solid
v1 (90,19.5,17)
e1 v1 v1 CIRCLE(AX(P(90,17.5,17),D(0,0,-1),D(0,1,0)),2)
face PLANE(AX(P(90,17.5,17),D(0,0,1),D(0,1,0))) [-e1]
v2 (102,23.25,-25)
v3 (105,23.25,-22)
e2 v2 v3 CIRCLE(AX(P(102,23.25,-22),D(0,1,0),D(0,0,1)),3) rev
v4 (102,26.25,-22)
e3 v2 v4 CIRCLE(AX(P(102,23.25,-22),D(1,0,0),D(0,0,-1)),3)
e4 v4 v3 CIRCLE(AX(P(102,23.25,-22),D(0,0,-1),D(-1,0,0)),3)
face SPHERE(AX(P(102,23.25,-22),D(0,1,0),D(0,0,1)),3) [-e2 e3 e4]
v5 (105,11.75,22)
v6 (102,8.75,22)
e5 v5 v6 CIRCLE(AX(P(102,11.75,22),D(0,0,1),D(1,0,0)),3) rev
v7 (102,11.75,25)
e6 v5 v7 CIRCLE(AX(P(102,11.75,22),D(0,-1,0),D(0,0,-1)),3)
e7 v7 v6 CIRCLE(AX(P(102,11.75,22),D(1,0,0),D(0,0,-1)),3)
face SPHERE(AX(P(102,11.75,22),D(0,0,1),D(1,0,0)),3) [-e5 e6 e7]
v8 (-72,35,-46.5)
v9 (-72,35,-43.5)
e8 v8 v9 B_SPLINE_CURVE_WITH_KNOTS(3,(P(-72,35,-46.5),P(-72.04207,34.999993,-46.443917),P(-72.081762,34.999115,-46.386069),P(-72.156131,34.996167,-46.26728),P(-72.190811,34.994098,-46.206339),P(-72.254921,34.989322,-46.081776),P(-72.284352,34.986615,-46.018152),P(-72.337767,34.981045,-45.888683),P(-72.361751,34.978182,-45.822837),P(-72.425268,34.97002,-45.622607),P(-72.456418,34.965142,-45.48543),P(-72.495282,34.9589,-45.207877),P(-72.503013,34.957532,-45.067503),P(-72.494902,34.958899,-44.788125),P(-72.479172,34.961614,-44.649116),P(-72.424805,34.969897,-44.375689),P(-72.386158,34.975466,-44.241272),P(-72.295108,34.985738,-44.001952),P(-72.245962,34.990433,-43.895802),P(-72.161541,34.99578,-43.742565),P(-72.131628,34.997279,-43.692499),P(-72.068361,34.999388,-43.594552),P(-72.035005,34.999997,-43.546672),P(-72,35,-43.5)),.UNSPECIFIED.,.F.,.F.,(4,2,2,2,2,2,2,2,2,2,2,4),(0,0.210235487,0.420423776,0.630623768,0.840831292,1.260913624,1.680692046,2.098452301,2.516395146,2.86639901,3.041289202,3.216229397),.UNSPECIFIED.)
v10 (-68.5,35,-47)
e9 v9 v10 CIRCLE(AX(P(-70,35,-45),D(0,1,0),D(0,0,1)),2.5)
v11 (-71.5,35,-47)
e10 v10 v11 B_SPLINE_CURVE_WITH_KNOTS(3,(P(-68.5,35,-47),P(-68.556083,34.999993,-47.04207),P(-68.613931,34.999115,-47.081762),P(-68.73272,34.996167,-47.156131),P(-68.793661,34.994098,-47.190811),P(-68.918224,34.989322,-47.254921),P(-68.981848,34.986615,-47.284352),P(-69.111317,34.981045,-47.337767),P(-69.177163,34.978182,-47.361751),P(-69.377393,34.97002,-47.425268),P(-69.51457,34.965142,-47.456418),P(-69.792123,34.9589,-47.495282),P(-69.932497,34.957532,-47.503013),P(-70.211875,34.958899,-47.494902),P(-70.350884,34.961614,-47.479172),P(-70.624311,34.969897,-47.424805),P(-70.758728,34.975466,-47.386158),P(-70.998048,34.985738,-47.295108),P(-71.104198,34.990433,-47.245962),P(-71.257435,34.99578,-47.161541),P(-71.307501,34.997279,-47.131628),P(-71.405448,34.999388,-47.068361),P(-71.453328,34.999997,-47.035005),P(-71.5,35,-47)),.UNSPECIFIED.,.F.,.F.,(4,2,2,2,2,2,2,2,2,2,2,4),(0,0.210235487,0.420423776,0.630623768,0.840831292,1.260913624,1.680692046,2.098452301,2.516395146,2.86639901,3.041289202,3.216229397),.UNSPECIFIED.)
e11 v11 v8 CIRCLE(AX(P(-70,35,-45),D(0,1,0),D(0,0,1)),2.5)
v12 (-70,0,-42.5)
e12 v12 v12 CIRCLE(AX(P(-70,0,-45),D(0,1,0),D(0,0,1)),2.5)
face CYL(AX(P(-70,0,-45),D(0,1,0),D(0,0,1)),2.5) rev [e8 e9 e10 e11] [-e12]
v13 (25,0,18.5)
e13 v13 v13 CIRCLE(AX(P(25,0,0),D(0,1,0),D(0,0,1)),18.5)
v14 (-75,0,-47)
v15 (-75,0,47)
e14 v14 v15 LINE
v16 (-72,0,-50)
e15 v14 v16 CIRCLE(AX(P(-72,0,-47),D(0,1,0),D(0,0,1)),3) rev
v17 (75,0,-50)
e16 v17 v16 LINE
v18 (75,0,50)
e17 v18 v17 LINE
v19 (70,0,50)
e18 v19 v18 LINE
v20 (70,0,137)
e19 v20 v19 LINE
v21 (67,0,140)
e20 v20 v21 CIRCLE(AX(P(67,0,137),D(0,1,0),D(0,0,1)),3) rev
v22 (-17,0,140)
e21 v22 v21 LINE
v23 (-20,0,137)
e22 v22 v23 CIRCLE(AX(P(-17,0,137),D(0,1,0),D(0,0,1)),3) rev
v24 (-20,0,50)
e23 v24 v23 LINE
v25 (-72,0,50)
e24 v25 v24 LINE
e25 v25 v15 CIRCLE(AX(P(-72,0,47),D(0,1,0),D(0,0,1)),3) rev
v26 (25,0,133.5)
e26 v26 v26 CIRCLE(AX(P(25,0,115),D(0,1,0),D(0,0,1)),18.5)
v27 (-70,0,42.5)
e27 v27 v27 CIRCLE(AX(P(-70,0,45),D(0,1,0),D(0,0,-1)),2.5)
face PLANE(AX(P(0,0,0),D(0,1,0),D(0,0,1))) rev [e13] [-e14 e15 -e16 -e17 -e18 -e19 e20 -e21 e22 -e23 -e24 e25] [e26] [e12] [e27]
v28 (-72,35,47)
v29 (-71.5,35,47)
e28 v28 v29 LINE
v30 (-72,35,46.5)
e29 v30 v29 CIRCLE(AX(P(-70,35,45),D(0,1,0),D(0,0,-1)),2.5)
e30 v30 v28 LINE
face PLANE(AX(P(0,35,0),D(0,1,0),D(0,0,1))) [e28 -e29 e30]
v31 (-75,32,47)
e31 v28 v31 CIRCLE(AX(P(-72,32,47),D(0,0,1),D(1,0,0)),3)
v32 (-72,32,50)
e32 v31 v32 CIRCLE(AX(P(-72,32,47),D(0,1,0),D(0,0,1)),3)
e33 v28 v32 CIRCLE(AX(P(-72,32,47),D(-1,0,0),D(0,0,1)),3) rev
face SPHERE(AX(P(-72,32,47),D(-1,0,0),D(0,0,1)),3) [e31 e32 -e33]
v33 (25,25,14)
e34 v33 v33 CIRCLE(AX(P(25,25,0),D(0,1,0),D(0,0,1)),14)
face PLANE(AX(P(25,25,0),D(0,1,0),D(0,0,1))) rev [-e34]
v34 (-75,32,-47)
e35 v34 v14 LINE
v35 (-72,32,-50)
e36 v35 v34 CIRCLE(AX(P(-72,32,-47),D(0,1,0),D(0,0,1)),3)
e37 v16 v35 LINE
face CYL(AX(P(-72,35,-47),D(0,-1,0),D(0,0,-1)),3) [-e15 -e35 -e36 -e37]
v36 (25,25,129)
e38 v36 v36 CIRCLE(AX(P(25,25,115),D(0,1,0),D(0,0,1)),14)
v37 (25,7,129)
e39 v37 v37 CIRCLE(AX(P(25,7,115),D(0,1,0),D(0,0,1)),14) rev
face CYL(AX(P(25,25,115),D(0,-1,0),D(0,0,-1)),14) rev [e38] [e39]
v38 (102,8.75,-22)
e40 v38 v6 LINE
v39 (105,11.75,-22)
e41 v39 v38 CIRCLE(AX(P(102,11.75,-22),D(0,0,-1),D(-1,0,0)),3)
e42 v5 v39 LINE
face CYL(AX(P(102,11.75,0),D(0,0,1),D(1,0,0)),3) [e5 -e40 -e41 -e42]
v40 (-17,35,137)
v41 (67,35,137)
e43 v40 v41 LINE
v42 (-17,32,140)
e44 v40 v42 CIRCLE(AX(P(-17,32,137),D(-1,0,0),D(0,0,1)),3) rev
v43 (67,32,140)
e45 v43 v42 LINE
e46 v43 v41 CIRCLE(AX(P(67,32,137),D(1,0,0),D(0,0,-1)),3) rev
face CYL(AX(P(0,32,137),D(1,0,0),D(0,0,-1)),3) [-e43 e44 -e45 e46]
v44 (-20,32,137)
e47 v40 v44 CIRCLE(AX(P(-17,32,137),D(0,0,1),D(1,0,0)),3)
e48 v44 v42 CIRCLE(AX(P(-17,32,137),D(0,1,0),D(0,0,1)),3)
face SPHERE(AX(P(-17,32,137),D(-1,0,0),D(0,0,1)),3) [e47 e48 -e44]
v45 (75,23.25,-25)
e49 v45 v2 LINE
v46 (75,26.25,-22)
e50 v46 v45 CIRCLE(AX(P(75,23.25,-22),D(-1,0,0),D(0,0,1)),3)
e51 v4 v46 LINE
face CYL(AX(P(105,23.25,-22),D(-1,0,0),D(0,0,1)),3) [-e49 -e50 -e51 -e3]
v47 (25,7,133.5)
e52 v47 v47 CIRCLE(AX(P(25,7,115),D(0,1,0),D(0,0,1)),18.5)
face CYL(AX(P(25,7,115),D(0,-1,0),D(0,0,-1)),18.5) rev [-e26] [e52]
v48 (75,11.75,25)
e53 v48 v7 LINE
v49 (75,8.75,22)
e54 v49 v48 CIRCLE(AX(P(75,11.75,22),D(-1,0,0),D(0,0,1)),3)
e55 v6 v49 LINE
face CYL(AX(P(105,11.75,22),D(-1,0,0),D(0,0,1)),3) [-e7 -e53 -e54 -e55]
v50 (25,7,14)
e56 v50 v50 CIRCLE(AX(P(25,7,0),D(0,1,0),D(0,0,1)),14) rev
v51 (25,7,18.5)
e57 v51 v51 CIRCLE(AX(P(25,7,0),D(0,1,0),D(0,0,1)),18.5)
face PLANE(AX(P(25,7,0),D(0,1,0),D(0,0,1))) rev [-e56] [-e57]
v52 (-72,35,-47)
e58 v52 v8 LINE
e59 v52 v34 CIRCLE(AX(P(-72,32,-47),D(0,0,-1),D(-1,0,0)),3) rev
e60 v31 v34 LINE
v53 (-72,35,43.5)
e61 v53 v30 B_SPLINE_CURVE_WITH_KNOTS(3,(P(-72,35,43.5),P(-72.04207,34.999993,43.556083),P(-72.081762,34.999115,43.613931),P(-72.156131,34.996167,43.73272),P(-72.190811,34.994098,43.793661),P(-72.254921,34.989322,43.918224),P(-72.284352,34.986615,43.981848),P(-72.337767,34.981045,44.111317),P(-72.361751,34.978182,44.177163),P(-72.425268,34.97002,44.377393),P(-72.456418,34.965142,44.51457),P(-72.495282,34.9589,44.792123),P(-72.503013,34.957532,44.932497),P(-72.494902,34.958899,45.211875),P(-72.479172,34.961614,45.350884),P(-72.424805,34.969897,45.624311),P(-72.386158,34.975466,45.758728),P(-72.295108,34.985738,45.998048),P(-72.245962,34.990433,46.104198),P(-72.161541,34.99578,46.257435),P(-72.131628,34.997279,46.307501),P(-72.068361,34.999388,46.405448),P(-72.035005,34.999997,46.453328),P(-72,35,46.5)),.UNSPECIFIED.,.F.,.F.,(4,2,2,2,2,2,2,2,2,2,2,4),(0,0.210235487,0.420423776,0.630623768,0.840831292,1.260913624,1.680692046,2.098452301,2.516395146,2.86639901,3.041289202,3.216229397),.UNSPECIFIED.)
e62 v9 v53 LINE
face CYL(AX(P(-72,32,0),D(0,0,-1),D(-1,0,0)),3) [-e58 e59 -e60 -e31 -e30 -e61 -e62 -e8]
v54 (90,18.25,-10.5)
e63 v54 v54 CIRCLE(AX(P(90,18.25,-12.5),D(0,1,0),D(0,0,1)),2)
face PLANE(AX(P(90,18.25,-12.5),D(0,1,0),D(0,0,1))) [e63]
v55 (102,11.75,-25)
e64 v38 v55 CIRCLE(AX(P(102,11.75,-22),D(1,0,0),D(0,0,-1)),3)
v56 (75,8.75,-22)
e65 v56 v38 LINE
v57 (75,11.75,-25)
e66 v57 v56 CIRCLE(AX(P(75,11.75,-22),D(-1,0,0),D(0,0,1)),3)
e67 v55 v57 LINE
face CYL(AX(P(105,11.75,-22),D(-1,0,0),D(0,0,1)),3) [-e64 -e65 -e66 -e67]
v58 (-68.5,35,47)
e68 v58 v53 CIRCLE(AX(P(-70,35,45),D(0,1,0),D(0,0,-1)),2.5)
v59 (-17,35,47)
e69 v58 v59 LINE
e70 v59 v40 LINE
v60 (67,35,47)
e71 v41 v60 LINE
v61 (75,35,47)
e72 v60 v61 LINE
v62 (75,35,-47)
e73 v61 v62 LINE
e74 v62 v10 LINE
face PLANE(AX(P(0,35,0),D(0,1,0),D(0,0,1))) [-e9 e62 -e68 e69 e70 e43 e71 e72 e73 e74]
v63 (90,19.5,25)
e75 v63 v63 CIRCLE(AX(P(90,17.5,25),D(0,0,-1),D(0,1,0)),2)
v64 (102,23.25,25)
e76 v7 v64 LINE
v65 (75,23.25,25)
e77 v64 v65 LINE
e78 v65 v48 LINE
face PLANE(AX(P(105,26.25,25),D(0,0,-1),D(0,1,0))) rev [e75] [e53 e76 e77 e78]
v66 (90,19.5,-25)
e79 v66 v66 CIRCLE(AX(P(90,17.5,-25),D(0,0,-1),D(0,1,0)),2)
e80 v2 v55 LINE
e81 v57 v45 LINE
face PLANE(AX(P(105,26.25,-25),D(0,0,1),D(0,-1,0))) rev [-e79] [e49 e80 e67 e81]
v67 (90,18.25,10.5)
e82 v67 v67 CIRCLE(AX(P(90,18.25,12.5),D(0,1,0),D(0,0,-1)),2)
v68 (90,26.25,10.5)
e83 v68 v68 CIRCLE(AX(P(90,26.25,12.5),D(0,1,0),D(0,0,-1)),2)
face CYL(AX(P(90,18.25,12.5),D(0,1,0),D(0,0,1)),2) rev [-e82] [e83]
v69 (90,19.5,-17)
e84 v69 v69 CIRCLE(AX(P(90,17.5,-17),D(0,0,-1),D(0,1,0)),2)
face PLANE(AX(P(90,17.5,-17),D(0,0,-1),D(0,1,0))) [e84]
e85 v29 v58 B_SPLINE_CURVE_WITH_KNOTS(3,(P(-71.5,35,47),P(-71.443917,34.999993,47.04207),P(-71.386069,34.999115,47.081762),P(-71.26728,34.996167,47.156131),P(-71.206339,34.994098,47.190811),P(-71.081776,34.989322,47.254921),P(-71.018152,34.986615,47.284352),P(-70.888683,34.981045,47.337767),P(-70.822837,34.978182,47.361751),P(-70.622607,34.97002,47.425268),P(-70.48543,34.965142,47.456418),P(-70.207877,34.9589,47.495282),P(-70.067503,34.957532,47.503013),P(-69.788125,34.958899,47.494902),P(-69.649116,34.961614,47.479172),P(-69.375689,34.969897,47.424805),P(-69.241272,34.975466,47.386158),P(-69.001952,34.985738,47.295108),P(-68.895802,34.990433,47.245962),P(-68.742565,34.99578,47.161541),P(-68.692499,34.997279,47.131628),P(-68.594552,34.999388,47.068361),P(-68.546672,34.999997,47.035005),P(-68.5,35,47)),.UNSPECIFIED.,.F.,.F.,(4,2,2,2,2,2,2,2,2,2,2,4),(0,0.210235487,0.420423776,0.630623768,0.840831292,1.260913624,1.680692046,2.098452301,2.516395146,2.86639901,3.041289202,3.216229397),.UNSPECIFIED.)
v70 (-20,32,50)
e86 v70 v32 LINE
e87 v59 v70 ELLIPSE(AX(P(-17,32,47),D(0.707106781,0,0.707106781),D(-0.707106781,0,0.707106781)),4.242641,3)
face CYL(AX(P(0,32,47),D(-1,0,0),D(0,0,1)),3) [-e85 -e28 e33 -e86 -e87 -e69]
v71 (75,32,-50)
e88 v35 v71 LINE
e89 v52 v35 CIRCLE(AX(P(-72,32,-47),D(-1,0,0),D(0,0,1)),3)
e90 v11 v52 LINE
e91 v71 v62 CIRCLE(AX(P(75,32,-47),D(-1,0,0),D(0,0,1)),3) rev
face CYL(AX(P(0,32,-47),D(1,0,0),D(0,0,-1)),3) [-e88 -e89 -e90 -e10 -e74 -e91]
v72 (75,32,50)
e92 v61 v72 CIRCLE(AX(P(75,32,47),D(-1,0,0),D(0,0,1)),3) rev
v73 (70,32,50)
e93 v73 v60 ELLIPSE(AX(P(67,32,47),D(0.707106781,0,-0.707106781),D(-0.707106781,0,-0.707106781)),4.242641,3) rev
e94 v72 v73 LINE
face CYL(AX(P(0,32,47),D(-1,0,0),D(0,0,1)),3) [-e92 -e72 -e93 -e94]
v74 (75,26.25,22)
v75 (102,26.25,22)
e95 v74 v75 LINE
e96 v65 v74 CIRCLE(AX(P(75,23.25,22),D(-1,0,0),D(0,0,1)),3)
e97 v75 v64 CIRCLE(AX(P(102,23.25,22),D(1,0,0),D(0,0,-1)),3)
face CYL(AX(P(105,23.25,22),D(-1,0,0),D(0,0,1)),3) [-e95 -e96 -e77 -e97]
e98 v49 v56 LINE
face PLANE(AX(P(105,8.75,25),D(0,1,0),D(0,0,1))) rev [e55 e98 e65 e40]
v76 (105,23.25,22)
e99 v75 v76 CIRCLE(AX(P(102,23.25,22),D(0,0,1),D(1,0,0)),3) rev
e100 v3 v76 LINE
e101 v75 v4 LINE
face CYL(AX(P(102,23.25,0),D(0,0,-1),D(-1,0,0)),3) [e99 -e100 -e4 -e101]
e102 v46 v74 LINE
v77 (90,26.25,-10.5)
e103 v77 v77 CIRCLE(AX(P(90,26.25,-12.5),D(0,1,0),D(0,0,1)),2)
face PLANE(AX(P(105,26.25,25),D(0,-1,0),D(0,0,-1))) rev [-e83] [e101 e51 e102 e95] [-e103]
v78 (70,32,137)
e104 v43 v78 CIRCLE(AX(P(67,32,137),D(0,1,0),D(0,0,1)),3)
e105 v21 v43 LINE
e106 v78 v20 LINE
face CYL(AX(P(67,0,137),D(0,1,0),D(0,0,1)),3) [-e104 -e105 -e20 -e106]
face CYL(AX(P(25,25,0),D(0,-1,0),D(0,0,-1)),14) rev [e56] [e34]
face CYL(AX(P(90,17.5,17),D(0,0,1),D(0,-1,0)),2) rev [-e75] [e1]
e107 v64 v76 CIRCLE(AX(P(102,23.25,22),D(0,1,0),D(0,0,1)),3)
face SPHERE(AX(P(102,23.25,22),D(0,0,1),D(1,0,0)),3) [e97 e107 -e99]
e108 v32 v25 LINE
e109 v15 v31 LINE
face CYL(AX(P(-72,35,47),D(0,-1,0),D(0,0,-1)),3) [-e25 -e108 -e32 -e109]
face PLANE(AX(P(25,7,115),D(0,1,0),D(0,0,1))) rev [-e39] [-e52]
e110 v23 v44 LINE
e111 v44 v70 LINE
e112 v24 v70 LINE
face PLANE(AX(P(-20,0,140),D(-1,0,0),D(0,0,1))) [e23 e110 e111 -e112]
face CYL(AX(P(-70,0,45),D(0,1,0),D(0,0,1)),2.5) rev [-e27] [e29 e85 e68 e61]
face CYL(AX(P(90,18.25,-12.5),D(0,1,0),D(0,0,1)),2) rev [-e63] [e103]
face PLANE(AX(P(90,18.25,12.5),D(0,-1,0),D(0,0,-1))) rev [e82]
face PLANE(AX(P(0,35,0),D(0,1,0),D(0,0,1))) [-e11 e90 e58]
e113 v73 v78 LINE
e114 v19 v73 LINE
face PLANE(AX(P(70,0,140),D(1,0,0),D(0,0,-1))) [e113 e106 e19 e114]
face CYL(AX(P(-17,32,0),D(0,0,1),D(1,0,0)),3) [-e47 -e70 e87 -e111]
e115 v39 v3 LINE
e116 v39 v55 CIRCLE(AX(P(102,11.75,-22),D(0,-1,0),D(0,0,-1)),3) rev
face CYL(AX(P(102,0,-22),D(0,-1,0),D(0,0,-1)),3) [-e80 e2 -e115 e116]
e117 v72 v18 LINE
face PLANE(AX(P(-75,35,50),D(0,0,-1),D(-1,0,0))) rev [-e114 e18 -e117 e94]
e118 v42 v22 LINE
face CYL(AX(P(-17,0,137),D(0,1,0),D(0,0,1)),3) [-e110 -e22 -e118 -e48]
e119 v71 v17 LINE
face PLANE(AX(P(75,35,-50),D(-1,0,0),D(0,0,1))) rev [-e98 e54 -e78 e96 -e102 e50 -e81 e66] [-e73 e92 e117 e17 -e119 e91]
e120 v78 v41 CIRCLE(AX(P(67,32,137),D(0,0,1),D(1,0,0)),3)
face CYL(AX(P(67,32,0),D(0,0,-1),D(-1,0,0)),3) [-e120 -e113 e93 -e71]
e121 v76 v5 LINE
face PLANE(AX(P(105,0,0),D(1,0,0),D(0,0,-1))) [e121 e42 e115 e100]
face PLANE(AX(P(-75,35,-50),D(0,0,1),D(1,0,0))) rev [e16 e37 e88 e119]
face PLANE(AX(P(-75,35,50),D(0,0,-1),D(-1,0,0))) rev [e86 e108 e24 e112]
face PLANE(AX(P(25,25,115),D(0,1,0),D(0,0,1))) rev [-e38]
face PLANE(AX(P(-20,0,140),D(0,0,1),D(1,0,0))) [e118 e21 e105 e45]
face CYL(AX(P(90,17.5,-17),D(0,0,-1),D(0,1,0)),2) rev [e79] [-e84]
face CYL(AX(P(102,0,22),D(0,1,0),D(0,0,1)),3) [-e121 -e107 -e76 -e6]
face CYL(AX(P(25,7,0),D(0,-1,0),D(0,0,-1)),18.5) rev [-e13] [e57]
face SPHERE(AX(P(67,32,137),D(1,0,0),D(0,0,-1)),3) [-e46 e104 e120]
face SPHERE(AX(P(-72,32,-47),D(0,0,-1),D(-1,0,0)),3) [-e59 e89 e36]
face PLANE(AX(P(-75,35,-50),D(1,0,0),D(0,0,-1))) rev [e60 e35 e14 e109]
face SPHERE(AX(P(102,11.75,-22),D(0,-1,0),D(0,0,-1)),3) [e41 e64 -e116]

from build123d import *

# Parameters (mm, degrees)
SKETCH1_W           = 150
SKETCH1_H           = 100
BOSS_EXTRUDE1_DEPTH = 35
SKETCH2_R           = 2.5
CUT_EXTRUDE1_DEPTH  = 97.695398029
SKETCH3_W           = 90
SKETCH3_H           = 90
BOSS_EXTRUDE2_DEPTH = 35
CUT_EXTRUDE2_START  = -35
SKETCH4_R           = 18.5
CUT_EXTRUDE2_DEPTH  = 7
CUT_EXTRUDE3_START  = -35
SKETCH5_R           = 14
CUT_EXTRUDE3_DEPTH  = 25
SKETCH6_W           = 50
SKETCH6_H           = 17.5
BOSS_EXTRUDE3_DEPTH = 30
SKETCH7_R           = 2
CUT_EXTRUDE4_DEPTH  = 8
SKETCH8_R           = 2
CUT_EXTRUDE5_DEPTH  = 8
FILLET1_R           = 3


with BuildPart() as part:
    # Sketch1 → Boss-Extrude1 (new body)
    with BuildSketch(Plane(origin=(0, 0, 0), x_dir=(1, 0, 0), z_dir=(0, 1, 0))):
        Rectangle(SKETCH1_W, SKETCH1_H)
    extrude(amount=BOSS_EXTRUDE1_DEPTH)

    # Sketch2 → Cut-Extrude1 (cut, through all)
    with BuildSketch(Plane(origin=(0, 35, 0), x_dir=(1, 0, 0), z_dir=(0, 1, 0))):
        with Locations(Location((-70, 45, 0), (0, 0, 270))):
            Circle(SKETCH2_R)
        with Locations(Location((-70, -45, 0), (0, 0, 90))):
            Circle(SKETCH2_R)
    extrude(amount=-CUT_EXTRUDE1_DEPTH, mode=Mode.SUBTRACT)

    # Sketch3 → Boss-Extrude2 (add)
    with BuildSketch(Plane(origin=(0, 35, 0), x_dir=(1, 0, 0), z_dir=(0, 1, 0))):
        with Locations((25, -95)):
            Rectangle(SKETCH3_W, SKETCH3_H)
    extrude(amount=-BOSS_EXTRUDE2_DEPTH)

    # Sketch4 → Cut-Extrude2 (cut)
    with BuildSketch(Plane(origin=(0, 35, 0), x_dir=(1, 0, 0), z_dir=(0, 1, 0)).offset(CUT_EXTRUDE2_START)):
        with Locations(Location((25, -115, 0), (0, 0, 270))):
            Circle(SKETCH4_R)
        with Locations(Location((25, 0, 0), (0, 0, 270))):
            Circle(SKETCH4_R)
    extrude(amount=CUT_EXTRUDE2_DEPTH, mode=Mode.SUBTRACT)

    # Sketch5 → Cut-Extrude3 (cut)
    with BuildSketch(Plane(origin=(0, 35, 0), x_dir=(1, 0, 0), z_dir=(0, 1, 0)).offset(CUT_EXTRUDE3_START)):
        with Locations(Location((25, -115, 0), (0, 0, 270))):
            Circle(SKETCH5_R)
        with Locations(Location((25, 0, 0), (0, 0, 270))):
            Circle(SKETCH5_R)
    extrude(amount=CUT_EXTRUDE3_DEPTH, mode=Mode.SUBTRACT)

    # Sketch6 → Boss-Extrude3 (add)
    with BuildSketch(Plane(origin=(75, 0, 0), x_dir=(0, 0, -1), z_dir=(1, 0, 0))):
        with Locations((0, 17.5)):
            Rectangle(SKETCH6_W, SKETCH6_H)
    extrude(amount=BOSS_EXTRUDE3_DEPTH)

    # Sketch7 → Cut-Extrude4 (cut)
    with BuildSketch(Plane(origin=(0, 26.25, 0), x_dir=(1, 0, 0), z_dir=(0, 1, 0))):
        with Locations(Location((90, 12.5, 0), (0, 0, 270))):
            Circle(SKETCH7_R)
        with Locations(Location((90, -12.5, 0), (0, 0, 90))):
            Circle(SKETCH7_R)
    extrude(amount=-CUT_EXTRUDE4_DEPTH, mode=Mode.SUBTRACT)

    # Sketch8 → Cut-Extrude5 (cut)
    with BuildSketch(Plane(origin=(0, 0, -25), x_dir=(-1, 0, 0), z_dir=(0, 0, -1))):
        with Locations(Location((-90, 17.5, 0), (0, 0, 90))):
            Circle(SKETCH8_R)
    cut_extrude5 = extrude(amount=-CUT_EXTRUDE5_DEPTH, mode=Mode.SUBTRACT)

    # Mirror1: Cut-Extrude5 across plane
    add(cut_extrude5.mirror(Plane.XY), mode=Mode.SUBTRACT)

    # Fillet1
    # the kernel refuses this fillet: 3 mm, written as the material it takes off along each edge
    with BuildSketch(Plane(origin=(-72, 32, 47), x_dir=(0, 1, 0), z_dir=(-1, 0, 0))) as fillet1_piece_1_section:
        Polygon((0, 0), (FILLET1_R, 0), (FILLET1_R, -FILLET1_R), (0, -FILLET1_R), align=None)
    fillet1_piece_1 = extrude(amount=FILLET1_R, mode=Mode.PRIVATE)
    fillet1_piece_1 = fillet1_piece_1 - Plane(origin=(-72, 32, 47), x_dir=(0, -0.7071067811865475, -0.7071067811865475), z_dir=(-1, 0, 0)) * Sphere(FILLET1_R, mode=Mode.PRIVATE)
    add(fillet1_piece_1, mode=Mode.SUBTRACT)
    with BuildSketch(Plane(origin=(-72, 32, -47), x_dir=(-1, 0, 0), z_dir=(0, 0, -1))) as fillet1_piece_2_section:
        Polygon((0, 0), (FILLET1_R, 0), (FILLET1_R, FILLET1_R), (0, FILLET1_R), align=None)
    fillet1_piece_2 = extrude(amount=FILLET1_R, mode=Mode.PRIVATE)
    fillet1_piece_2 = fillet1_piece_2 - Plane(origin=(-72, 32, -47), x_dir=(0.7071067811865475, -0.7071067811865475, 0), z_dir=(0, 0, -1)) * Sphere(FILLET1_R, mode=Mode.PRIVATE)
    add(fillet1_piece_2, mode=Mode.SUBTRACT)
    with BuildSketch(Plane(origin=(67, 32, 137), x_dir=(1, 0, 0), z_dir=(0, 1, 0))) as fillet1_piece_3_section:
        Polygon((0, 0), (FILLET1_R, 0), (FILLET1_R, -FILLET1_R), (0, -FILLET1_R), align=None)
    fillet1_piece_3 = extrude(amount=FILLET1_R, mode=Mode.PRIVATE)
    fillet1_piece_3 = fillet1_piece_3 - Plane(origin=(67, 32, 137), x_dir=(-0.7071067811865475, 0, -0.7071067811865475), z_dir=(0, 1, 0)) * Sphere(FILLET1_R, mode=Mode.PRIVATE)
    add(fillet1_piece_3, mode=Mode.SUBTRACT)
    with BuildSketch(Plane(origin=(-17, 32, 137), x_dir=(0, 1, 0), z_dir=(-1, 0, 0))) as fillet1_piece_4_section:
        Polygon((0, 0), (FILLET1_R, 0), (FILLET1_R, -FILLET1_R), (0, -FILLET1_R), align=None)
    fillet1_piece_4 = extrude(amount=FILLET1_R, mode=Mode.PRIVATE)
    fillet1_piece_4 = fillet1_piece_4 - Plane(origin=(-17, 32, 137), x_dir=(0, -0.7071067811865475, -0.7071067811865475), z_dir=(-1, 0, 0)) * Sphere(FILLET1_R, mode=Mode.PRIVATE)
    add(fillet1_piece_4, mode=Mode.SUBTRACT)
    with BuildSketch(Plane(origin=(102, 11.75, -22), x_dir=(0, 0, -1), z_dir=(0, -1, 0))) as fillet1_piece_5_section:
        Polygon((0, 0), (FILLET1_R, 0), (FILLET1_R, FILLET1_R), (0, FILLET1_R), align=None)
    fillet1_piece_5 = extrude(amount=FILLET1_R, mode=Mode.PRIVATE)
    fillet1_piece_5 = fillet1_piece_5 - Plane(origin=(102, 11.75, -22), x_dir=(-0.7071067811865475, 0, 0.7071067811865475), z_dir=(0, -1, 0)) * Sphere(FILLET1_R, mode=Mode.PRIVATE)
    add(fillet1_piece_5, mode=Mode.SUBTRACT)
    with BuildSketch(Plane(origin=(102, 23.25, -22), x_dir=(0, 1, 0), z_dir=(0, 0, -1))) as fillet1_piece_6_section:
        Polygon((0, 0), (FILLET1_R, 0), (FILLET1_R, FILLET1_R), (0, FILLET1_R), align=None)
    fillet1_piece_6 = extrude(amount=FILLET1_R, mode=Mode.PRIVATE)
    fillet1_piece_6 = fillet1_piece_6 - Plane(origin=(102, 23.25, -22), x_dir=(-0.7071067811865475, -0.7071067811865475, 0), z_dir=(0, 0, -1)) * Sphere(FILLET1_R, mode=Mode.PRIVATE)
    add(fillet1_piece_6, mode=Mode.SUBTRACT)
    with BuildSketch(Plane(origin=(102, 23.25, 22), x_dir=(1, 0, 0), z_dir=(0, 1, 0))) as fillet1_piece_7_section:
        Polygon((0, 0), (FILLET1_R, 0), (FILLET1_R, -FILLET1_R), (0, -FILLET1_R), align=None)
    fillet1_piece_7 = extrude(amount=FILLET1_R, mode=Mode.PRIVATE)
    fillet1_piece_7 = fillet1_piece_7 - Plane(origin=(102, 23.25, 22), x_dir=(-0.7071067811865475, 0, -0.7071067811865475), z_dir=(0, 1, 0)) * Sphere(FILLET1_R, mode=Mode.PRIVATE)
    add(fillet1_piece_7, mode=Mode.SUBTRACT)
    with BuildSketch(Plane(origin=(102, 11.75, 22), x_dir=(1, 0, 0), z_dir=(0, -1, 0))) as fillet1_piece_8_section:
        Polygon((0, 0), (FILLET1_R, 0), (FILLET1_R, FILLET1_R), (0, FILLET1_R), align=None)
    fillet1_piece_8 = extrude(amount=FILLET1_R, mode=Mode.PRIVATE)
    fillet1_piece_8 = fillet1_piece_8 - Plane(origin=(102, 11.75, 22), x_dir=(-0.7071067811865475, 0, -0.7071067811865475), z_dir=(0, -1, 0)) * Sphere(FILLET1_R, mode=Mode.PRIVATE)
    add(fillet1_piece_8, mode=Mode.SUBTRACT)
    with BuildSketch(Plane(origin=(-75, 35, 47), x_dir=(0, -1, 0), z_dir=(0, 0, -1))) as fillet1_piece_9:
        with BuildLine():
            CenterArc((FILLET1_R, -FILLET1_R), FILLET1_R, 90, 90)
            Line((0, -FILLET1_R), (0, 0))
            Line((0, 0), (FILLET1_R, 0))
        make_face()
    extrude(amount=94, mode=Mode.SUBTRACT)
    with BuildSketch(Plane(origin=(-20, 35, 50), x_dir=(0, 0, -1), z_dir=(-1, 0, 0))) as fillet1_piece_10:
        with BuildLine():
            CenterArc((FILLET1_R, FILLET1_R), FILLET1_R, 180, 90)
            Line((0, FILLET1_R), (0, 0))
            Line((0, 0), (FILLET1_R, 0))
        make_face()
    extrude(amount=52, mode=Mode.SUBTRACT)
    with BuildSketch(Plane(origin=(82.5, 35, 50), x_dir=(0, 0, -1), z_dir=(-1, 0, 0))) as fillet1_piece_11:
        with BuildLine():
            CenterArc((FILLET1_R, FILLET1_R), FILLET1_R, 180, 90)
            Line((0, FILLET1_R), (0, 0))
            Line((0, 0), (FILLET1_R, 0))
        make_face()
    extrude(amount=12.5, mode=Mode.SUBTRACT)
    with BuildSketch(Plane(origin=(70, 32, 140), x_dir=(0, 0, -1), z_dir=(0, -1, 0)), Plane(origin=(-75, -7.5, 50), x_dir=(0, 0, -1), z_dir=(0, 1, 0)), Plane(origin=(-75, -7.5, -50), x_dir=(1, 0, 0), z_dir=(0, 1, 0))) as fillet1_piece_12:
        with BuildLine():
            CenterArc((FILLET1_R, -FILLET1_R), FILLET1_R, 90, 90)
            Line((0, -FILLET1_R), (0, 0))
            Line((0, 0), (FILLET1_R, 0))
        make_face()
    extrude(amount=39.5, mode=Mode.SUBTRACT)
    with BuildSketch(Plane(origin=(-20, 32, 140), x_dir=(0, 0, -1), z_dir=(0, -1, 0))) as fillet1_piece_13:
        with BuildLine():
            CenterArc((FILLET1_R, FILLET1_R), FILLET1_R, 180, 90)
            Line((0, FILLET1_R), (0, 0))
            Line((0, 0), (FILLET1_R, 0))
        make_face()
    extrude(amount=39.5, mode=Mode.SUBTRACT)
    with BuildSketch(Plane(origin=(70, 35, 137), x_dir=(-1, 0, 0), z_dir=(0, 0, -1)), Plane(origin=(-20, 35, 50), x_dir=(1, 0, 0), z_dir=(0, 0, 1))) as fillet1_piece_14:
        with BuildLine():
            CenterArc((FILLET1_R, -FILLET1_R), FILLET1_R, 90, 90)
            Line((0, -FILLET1_R), (0, 0))
            Line((0, 0), (FILLET1_R, 0))
        make_face()
    extrude(amount=87, mode=Mode.SUBTRACT)
    with BuildSketch(Plane(origin=(-17, 35, 140), x_dir=(0, 0, -1), z_dir=(1, 0, 0))) as fillet1_piece_15:
        with BuildLine():
            CenterArc((FILLET1_R, -FILLET1_R), FILLET1_R, 90, 90)
            Line((0, -FILLET1_R), (0, 0))
            Line((0, 0), (FILLET1_R, 0))
        make_face()
    extrude(amount=84, mode=Mode.SUBTRACT)
    with BuildSketch(Plane(origin=(75, 8.75, -25), x_dir=(0, 0, 1), z_dir=(1, 0, 0)), Plane(origin=(75, 26.25, -25), x_dir=(0, -1, 0), z_dir=(1, 0, 0)), Plane(origin=(75, 8.75, 25), x_dir=(0, 1, 0), z_dir=(1, 0, 0))) as fillet1_piece_16:
        with BuildLine():
            CenterArc((FILLET1_R, -FILLET1_R), FILLET1_R, 90, 90)
            Line((0, -FILLET1_R), (0, 0))
            Line((0, 0), (FILLET1_R, 0))
        make_face()
    extrude(amount=27, mode=Mode.SUBTRACT)
    with BuildSketch(Plane(origin=(75, 26.25, 25), x_dir=(0, -1, 0), z_dir=(1, 0, 0))) as fillet1_piece_17:
        with BuildLine():
            CenterArc((FILLET1_R, FILLET1_R), FILLET1_R, 180, 90)
            Line((0, FILLET1_R), (0, 0))
            Line((0, 0), (FILLET1_R, 0))
        make_face()
    extrude(amount=27, mode=Mode.SUBTRACT)
    with BuildSketch(Plane(origin=(105, 23.25, -25), x_dir=(-1, 0, 0), z_dir=(0, -1, 0)), Plane(origin=(105, 11.75, 25), x_dir=(-1, 0, 0), z_dir=(0, 1, 0))) as fillet1_piece_18:
        with BuildLine():
            CenterArc((FILLET1_R, -FILLET1_R), FILLET1_R, 90, 90)
            Line((0, -FILLET1_R), (0, 0))
            Line((0, 0), (FILLET1_R, 0))
        make_face()
    extrude(amount=11.5, mode=Mode.SUBTRACT)
    with BuildSketch(Plane(origin=(105, 26.25, 22), x_dir=(-1, 0, 0), z_dir=(0, 0, -1)), Plane(origin=(105, 8.75, -22), x_dir=(-1, 0, 0), z_dir=(0, 0, 1))) as fillet1_piece_19:
        with BuildLine():
            CenterArc((FILLET1_R, -FILLET1_R), FILLET1_R, 90, 90)
            Line((0, -FILLET1_R), (0, 0))
            Line((0, 0), (FILLET1_R, 0))
        make_face()
    extrude(amount=44, mode=Mode.SUBTRACT)
    with BuildSketch(Plane(origin=(-72, 35, -50), x_dir=(0, -1, 0), z_dir=(1, 0, 0))) as fillet1_piece_20:
        with BuildLine():
            CenterArc((FILLET1_R, -FILLET1_R), FILLET1_R, 90, 90)
            Line((0, -FILLET1_R), (0, 0))
            Line((0, 0), (FILLET1_R, 0))
        make_face()
    extrude(amount=154.5, mode=Mode.SUBTRACT)
    with BuildSketch(Plane(origin=(-20, 35, 42.5), x_dir=(1, 0, 0), z_dir=(0, 0, 1))) as fillet1_piece_21a_section:
        with BuildLine():
            CenterArc((FILLET1_R, -FILLET1_R), FILLET1_R, 90, 90)
            Line((0, -FILLET1_R), (0, 0))
            Line((0, 0), (FILLET1_R, 0))
        make_face()
    fillet1_piece_21a = extrude(amount=94.5, mode=Mode.PRIVATE)
    fillet1_piece_21a = split(fillet1_piece_21a, bisect_by=Plane(origin=(-19.320814657, 34.320814657, 50), z_dir=(0, 0, -1)), keep=Keep.TOP, mode=Mode.PRIVATE)
    with BuildSketch(Plane(origin=(-12.5, 35, 50), x_dir=(0, 0, -1), z_dir=(-1, 0, 0))) as fillet1_piece_21b_section:
        with BuildLine():
            CenterArc((FILLET1_R, FILLET1_R), FILLET1_R, 180, 90)
            Line((0, FILLET1_R), (0, 0))
            Line((0, 0), (FILLET1_R, 0))
        make_face()
    fillet1_piece_21b = extrude(amount=59.5, mode=Mode.PRIVATE)
    fillet1_piece_21b = split(fillet1_piece_21b, bisect_by=Plane(origin=(-20, 34.320814657, 49.320814657), z_dir=(1, 0, 0)), keep=Keep.TOP, mode=Mode.PRIVATE)
    fillet1_piece_21 = fillet1_piece_21a & fillet1_piece_21b
    add(fillet1_piece_21, mode=Mode.SUBTRACT)
    with BuildSketch(Plane(origin=(82.5, 35, 50), x_dir=(0, 0, -1), z_dir=(-1, 0, 0))) as fillet1_piece_22a_section:
        with BuildLine():
            CenterArc((FILLET1_R, FILLET1_R), FILLET1_R, 180, 90)
            Line((0, FILLET1_R), (0, 0))
            Line((0, 0), (FILLET1_R, 0))
        make_face()
    fillet1_piece_22a = extrude(amount=20, mode=Mode.PRIVATE)
    fillet1_piece_22a = split(fillet1_piece_22a, bisect_by=Plane(origin=(70, 34.320814657, 49.320814657), z_dir=(-1, 0, 0)), keep=Keep.TOP, mode=Mode.PRIVATE)
    with BuildSketch(Plane(origin=(70, 35, 137), x_dir=(-1, 0, 0), z_dir=(0, 0, -1))) as fillet1_piece_22b_section:
        with BuildLine():
            CenterArc((FILLET1_R, -FILLET1_R), FILLET1_R, 90, 90)
            Line((0, -FILLET1_R), (0, 0))
            Line((0, 0), (FILLET1_R, 0))
        make_face()
    fillet1_piece_22b = extrude(amount=94.5, mode=Mode.PRIVATE)
    fillet1_piece_22b = split(fillet1_piece_22b, bisect_by=Plane(origin=(69.320814657, 34.320814657, 50), z_dir=(0, 0, -1)), keep=Keep.TOP, mode=Mode.PRIVATE)
    fillet1_piece_22 = fillet1_piece_22a & fillet1_piece_22b
    add(fillet1_piece_22, mode=Mode.SUBTRACT)


solid = part.part
